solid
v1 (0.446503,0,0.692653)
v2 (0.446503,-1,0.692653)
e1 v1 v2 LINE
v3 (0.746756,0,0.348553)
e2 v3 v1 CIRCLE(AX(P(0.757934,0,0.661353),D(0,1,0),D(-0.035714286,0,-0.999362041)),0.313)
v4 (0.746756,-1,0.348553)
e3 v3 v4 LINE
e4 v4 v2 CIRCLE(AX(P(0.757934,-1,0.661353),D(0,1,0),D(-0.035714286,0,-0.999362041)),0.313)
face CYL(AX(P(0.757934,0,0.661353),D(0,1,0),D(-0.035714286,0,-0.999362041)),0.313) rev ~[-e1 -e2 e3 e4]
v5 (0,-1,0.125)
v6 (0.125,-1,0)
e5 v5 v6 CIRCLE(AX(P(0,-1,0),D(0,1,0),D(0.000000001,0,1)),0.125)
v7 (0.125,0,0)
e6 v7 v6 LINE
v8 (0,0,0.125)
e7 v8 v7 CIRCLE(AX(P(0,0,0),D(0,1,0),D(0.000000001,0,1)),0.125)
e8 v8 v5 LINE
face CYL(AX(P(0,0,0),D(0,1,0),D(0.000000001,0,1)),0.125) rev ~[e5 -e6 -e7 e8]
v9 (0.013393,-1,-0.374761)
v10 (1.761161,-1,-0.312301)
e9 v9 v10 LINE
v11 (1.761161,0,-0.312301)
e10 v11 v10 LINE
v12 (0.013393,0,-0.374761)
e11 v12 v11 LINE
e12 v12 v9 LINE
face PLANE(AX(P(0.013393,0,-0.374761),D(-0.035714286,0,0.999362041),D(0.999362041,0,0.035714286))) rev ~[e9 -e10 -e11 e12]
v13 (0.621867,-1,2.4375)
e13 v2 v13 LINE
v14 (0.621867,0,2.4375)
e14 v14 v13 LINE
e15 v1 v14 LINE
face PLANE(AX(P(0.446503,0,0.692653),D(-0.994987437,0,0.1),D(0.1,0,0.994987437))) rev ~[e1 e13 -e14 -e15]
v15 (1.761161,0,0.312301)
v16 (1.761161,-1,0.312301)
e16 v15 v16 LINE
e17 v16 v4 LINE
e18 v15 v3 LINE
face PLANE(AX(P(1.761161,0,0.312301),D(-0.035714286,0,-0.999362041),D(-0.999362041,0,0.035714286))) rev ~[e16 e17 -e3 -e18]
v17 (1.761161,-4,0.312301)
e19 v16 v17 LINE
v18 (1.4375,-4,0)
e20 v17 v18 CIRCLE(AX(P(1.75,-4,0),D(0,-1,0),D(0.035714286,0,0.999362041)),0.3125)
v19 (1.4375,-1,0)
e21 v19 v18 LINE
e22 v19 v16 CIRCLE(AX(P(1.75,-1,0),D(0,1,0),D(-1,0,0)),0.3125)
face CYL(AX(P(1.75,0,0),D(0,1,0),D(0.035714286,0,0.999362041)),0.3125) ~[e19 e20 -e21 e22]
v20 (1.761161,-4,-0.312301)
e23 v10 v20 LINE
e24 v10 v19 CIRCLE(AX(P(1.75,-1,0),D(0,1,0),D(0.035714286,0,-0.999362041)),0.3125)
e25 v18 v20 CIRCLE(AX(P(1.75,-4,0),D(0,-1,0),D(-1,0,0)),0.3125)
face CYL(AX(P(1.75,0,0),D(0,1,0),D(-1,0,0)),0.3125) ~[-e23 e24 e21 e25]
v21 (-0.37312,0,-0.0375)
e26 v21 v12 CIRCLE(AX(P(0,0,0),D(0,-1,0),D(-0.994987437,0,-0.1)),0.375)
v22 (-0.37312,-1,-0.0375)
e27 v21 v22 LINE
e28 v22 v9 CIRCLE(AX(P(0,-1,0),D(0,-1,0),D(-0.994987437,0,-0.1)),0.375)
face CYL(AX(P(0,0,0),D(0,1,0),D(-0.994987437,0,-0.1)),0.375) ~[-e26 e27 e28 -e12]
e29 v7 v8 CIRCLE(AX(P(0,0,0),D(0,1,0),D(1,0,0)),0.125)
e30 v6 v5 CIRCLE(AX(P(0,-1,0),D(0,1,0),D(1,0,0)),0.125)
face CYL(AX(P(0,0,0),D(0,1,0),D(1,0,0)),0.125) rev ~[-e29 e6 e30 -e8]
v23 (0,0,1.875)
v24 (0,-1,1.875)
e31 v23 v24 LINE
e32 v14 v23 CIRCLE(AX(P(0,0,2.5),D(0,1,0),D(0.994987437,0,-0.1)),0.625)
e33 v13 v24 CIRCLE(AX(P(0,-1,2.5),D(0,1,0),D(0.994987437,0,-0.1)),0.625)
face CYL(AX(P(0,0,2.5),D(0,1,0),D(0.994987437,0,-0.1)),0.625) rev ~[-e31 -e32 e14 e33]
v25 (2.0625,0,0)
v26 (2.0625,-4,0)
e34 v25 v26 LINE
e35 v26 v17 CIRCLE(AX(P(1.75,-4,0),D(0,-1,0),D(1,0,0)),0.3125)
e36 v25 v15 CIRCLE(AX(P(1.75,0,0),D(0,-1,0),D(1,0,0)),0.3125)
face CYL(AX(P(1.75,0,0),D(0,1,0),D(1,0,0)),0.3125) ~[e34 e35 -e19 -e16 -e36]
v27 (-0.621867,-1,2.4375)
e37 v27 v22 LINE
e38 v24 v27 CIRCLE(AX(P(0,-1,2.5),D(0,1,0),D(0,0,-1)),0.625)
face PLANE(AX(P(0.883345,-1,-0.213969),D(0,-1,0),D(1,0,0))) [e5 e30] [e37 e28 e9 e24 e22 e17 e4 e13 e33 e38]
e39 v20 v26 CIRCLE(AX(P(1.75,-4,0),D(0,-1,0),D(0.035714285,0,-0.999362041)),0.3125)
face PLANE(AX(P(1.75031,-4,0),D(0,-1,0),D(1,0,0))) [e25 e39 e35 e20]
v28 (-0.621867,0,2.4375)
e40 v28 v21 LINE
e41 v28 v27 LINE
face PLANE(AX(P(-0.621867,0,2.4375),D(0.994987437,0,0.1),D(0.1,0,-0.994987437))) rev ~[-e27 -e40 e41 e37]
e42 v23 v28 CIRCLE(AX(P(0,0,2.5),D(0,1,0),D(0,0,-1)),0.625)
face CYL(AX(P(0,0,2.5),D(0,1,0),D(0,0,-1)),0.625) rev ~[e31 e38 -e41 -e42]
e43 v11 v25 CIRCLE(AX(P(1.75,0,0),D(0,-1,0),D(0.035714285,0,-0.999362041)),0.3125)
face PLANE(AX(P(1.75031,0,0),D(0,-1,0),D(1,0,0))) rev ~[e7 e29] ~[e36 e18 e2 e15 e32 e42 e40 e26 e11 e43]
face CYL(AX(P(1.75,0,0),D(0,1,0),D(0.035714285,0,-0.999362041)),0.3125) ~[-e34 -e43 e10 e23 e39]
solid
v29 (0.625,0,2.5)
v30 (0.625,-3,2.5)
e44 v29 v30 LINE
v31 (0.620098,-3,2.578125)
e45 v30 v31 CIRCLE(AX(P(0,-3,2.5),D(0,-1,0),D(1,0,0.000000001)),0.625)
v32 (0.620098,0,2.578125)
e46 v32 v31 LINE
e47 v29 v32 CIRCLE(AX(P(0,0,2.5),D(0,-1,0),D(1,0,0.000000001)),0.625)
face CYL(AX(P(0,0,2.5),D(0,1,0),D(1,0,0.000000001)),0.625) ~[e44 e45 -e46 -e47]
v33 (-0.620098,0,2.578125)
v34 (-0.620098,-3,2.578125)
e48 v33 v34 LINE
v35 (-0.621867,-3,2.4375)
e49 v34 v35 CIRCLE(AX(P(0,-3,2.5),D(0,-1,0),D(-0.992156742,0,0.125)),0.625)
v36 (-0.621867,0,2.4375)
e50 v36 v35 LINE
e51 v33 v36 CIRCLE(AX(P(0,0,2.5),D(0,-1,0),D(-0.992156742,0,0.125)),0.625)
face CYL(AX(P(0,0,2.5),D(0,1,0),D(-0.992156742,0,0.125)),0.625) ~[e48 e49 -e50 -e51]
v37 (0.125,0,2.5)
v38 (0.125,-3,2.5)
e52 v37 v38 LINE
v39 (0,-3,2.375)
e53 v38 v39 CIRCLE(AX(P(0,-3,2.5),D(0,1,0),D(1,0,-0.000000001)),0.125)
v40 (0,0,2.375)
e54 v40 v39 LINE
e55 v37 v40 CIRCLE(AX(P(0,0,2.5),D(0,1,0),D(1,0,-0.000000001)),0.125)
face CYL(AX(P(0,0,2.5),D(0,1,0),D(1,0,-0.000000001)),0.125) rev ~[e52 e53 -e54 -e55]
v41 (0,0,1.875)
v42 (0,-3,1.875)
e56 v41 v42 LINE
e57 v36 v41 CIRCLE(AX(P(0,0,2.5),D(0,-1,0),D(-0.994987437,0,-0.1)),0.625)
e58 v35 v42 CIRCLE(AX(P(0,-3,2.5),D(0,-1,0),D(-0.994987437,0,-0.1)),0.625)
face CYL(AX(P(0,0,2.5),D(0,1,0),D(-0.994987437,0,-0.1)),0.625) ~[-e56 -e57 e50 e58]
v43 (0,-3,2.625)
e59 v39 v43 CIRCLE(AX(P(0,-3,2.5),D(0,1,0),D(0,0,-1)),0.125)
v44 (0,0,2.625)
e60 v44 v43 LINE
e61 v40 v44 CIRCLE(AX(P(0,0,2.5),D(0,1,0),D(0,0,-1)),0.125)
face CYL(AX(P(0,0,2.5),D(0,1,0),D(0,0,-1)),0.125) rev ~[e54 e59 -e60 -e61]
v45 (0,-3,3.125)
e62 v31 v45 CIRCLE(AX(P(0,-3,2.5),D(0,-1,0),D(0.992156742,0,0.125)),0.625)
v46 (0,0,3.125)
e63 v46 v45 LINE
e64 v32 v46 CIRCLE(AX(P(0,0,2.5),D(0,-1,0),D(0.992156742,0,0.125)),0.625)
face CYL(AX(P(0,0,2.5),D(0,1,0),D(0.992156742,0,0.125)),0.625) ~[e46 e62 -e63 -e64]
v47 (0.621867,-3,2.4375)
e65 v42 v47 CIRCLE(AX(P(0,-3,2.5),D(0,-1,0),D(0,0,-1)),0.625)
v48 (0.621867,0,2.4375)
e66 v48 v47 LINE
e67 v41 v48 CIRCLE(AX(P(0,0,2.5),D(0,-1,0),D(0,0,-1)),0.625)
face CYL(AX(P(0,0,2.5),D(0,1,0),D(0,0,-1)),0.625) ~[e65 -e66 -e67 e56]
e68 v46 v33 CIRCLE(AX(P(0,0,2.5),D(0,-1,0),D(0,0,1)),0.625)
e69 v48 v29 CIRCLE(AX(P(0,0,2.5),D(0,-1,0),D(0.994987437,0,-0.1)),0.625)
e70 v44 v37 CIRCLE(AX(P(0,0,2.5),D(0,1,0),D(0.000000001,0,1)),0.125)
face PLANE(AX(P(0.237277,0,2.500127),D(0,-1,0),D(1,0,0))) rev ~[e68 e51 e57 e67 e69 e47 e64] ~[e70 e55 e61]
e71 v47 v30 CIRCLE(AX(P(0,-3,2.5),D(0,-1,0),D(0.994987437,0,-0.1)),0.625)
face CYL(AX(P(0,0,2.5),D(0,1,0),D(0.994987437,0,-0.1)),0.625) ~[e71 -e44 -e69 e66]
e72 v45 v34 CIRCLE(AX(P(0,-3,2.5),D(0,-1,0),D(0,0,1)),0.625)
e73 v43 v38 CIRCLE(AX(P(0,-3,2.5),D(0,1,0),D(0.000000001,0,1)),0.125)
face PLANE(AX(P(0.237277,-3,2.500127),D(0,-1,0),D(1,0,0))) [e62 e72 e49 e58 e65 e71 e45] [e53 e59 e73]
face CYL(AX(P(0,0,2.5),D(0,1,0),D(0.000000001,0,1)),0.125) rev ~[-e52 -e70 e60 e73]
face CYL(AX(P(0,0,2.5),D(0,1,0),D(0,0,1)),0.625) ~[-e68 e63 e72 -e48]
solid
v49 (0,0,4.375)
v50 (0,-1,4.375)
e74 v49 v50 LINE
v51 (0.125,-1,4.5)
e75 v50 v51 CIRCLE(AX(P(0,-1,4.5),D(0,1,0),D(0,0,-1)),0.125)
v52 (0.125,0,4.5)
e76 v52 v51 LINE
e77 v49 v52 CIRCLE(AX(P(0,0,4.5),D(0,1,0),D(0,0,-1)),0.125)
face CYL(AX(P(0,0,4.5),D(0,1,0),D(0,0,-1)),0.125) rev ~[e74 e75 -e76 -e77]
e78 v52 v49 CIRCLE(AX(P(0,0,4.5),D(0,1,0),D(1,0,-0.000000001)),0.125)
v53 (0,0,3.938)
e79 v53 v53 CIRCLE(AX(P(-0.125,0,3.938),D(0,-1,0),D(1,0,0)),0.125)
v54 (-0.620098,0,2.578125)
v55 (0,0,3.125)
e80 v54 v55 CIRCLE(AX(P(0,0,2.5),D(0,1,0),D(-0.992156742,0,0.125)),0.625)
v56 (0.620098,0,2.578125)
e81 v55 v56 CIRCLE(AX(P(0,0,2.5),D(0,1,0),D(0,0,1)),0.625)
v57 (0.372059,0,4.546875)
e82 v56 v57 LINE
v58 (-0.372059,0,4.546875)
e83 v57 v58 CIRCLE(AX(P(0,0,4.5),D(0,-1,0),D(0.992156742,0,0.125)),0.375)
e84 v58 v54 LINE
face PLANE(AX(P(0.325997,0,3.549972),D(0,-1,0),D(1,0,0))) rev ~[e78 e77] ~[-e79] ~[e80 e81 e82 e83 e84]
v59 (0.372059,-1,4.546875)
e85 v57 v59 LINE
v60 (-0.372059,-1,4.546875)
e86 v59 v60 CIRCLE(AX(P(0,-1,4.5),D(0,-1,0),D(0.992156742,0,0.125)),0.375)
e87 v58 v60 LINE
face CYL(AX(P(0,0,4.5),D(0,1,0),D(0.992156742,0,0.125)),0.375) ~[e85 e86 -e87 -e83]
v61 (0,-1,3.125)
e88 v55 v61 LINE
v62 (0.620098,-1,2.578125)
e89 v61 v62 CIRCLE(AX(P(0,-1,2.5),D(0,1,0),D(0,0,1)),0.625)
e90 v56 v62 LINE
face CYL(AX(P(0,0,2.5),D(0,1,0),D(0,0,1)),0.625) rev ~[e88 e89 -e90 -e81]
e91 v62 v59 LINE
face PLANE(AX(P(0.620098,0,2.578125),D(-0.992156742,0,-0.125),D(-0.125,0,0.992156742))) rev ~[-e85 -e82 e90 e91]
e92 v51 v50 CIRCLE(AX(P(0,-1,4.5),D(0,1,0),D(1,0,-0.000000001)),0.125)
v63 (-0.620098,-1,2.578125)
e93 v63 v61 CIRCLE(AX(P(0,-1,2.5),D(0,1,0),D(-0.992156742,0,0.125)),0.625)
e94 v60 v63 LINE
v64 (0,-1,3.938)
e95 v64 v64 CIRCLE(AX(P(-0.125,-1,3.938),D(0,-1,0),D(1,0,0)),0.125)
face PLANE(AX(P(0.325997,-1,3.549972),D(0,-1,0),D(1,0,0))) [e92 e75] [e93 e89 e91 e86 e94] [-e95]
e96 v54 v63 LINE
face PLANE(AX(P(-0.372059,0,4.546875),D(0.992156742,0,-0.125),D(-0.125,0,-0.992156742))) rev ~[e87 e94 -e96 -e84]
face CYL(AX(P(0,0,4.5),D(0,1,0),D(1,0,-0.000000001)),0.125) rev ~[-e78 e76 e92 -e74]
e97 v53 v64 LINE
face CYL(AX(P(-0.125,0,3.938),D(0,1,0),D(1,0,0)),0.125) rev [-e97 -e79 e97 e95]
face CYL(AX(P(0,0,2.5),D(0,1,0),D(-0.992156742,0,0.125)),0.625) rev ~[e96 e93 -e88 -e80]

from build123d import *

# Parameters (mm, degrees)
F1_DEPTH = 1
F0_R     = 0.125
F2_DEPTH = 3
F3_DEPTH = 4


with BuildPart() as f1:
    # F0 (on Front) → F1 (new body)
    with BuildSketch(Plane.XZ):
        with BuildLine():
            Line((1.4375, 0), (0.375, 0))
            ThreePointArc((0.375, 0), (0.2698585939, -0.2603869031), (0.0133928571, -0.3747607655))
            Line((0.0133928571, -0.3747607655), (1.7611607143, -0.3123006379))
            ThreePointArc((1.7611607143, -0.3123006379), (1.5330109141, -0.2248821616), (1.4375, 0))
        make_face()
        with BuildLine():
            Line((0.375, 0), (0.125, 0))
            ThreePointArc((0.125, 0), (-0.0883883476, -0.0883883476), (0, 0.125))
            Line((0, 0.125), (0, 0.375))
            ThreePointArc((0, 0.375), (-0.2781074433, 0.2515576475), (-0.3731202889, -0.0375))
            ThreePointArc((-0.3731202889, -0.0375), (-0.2465505268, -0.2825559019), (0.0133928571, -0.3747607655))
            ThreePointArc((0.0133928571, -0.3747607655), (0.2698585939, -0.2603869031), (0.375, 0))
        make_face()
        with BuildLine():
            ThreePointArc((0, 0.375), (0.2651650429, 0.2651650429), (0.375, 0))
            Line((0.375, 0), (1.4375, 0))
            ThreePointArc((1.4375, 0), (1.5330109141, 0.2248821616), (1.7611607143, 0.3123006379))
            Line((1.7611607143, 0.3123006379), (0.7467559055, 0.3485525083))
            ThreePointArc((0.7467559055, 0.3485525083), (0.5220944841, 0.4555653209), (0.4465034091, 0.6926528273))
            Line((0.4465034091, 0.6926528273), (0.6218671482, 2.4375))
            ThreePointArc((0.6218671482, 2.4375), (0.4192627458, 2.0364875946), (0, 1.875))
            Line((0, 1.875), (0, 0.375))
        make_face()
        with BuildLine():
            ThreePointArc((-0.3731202889, -0.0375), (-0.2781074433, 0.2515576475), (0, 0.375))
            Line((0, 0.375), (0, 1.875))
            ThreePointArc((0, 1.875), (-0.4192627458, 2.0364875946), (-0.6218671482, 2.4375))
            Line((-0.6218671482, 2.4375), (-0.3731202889, -0.0375))
        make_face()
        with BuildLine():
            ThreePointArc((0, 0.125), (0.0883883476, 0.0883883476), (0.125, 0))
            Line((0.125, 0), (0.375, 0))
            ThreePointArc((0.375, 0), (0.2651650429, 0.2651650429), (0, 0.375))
            Line((0, 0.375), (0, 0.125))
        make_face()
    extrude(amount=F1_DEPTH)

    # F0 (on Front) → F3 (join)
    with BuildSketch(Plane.XZ):
        with BuildLine():
            ThreePointArc((1.7611607143, 0.3123006379), (1.5330109141, 0.2248821616), (1.4375, 0))
            ThreePointArc((1.4375, 0), (1.5330109141, -0.2248821616), (1.7611607143, -0.3123006379))
            ThreePointArc((1.7611607143, -0.3123006379), (1.9748821616, -0.2169890859), (2.0625, 0))
            ThreePointArc((2.0625, 0), (1.9748821616, 0.2169890859), (1.7611607143, 0.3123006379))
        make_face()
        with BuildLine():
            ThreePointArc((1.875, 0), (1.75, -0.125), (1.625, 0))
            ThreePointArc((1.625, 0), (1.75, 0.125), (1.875, 0))
        make_face(mode=Mode.SUBTRACT)
        with BuildLine():
            ThreePointArc((1.875, 0), (1.75, 0.125), (1.625, 0))
            ThreePointArc((1.625, 0), (1.75, -0.125), (1.875, 0))
        make_face()
    extrude(amount=F3_DEPTH)


with BuildPart() as f1b:
    # F0 (on Front) → F1, piece 2 (new body)
    with BuildSketch(Plane.XZ):
        with BuildLine():
            Line((0, 3.938), (0, 3.125))
            ThreePointArc((0, 3.125), (0.4133986424, 2.96875), (0.6200979635, 2.578125))
            Line((0.6200979635, 2.578125), (0.3720587781, 4.546875))
            ThreePointArc((0.3720587781, 4.546875), (0.3742639722, 4.5234835922), (0.375, 4.5))
            ThreePointArc((0.375, 4.5), (0.2651650429, 4.2348349571), (0, 4.125))
            Line((0, 4.125), (0, 3.938))
        make_face()
        with BuildLine():
            Line((-0.3720587781, 4.546875), (-0.6200979635, 2.578125))
            ThreePointArc((-0.6200979635, 2.578125), (-0.4133986424, 2.96875), (0, 3.125))
            Line((0, 3.125), (0, 3.938))
            Line((0, 3.938), (0, 4.125))
            ThreePointArc((0, 4.125), (-0.28125, 4.2519608146), (-0.3720587781, 4.546875))
        make_face()
        with Locations((-0.125, 3.938)):
            Circle(F0_R, mode=Mode.SUBTRACT)
        with BuildLine():
            ThreePointArc((0.3720587781, 4.546875), (0, 4.875), (-0.3720587781, 4.546875))
            ThreePointArc((-0.3720587781, 4.546875), (-0.28125, 4.2519608146), (0, 4.125))
            ThreePointArc((0, 4.125), (0.2651650429, 4.2348349571), (0.375, 4.5))
            ThreePointArc((0.375, 4.5), (0.3742639722, 4.5234835922), (0.3720587781, 4.546875))
        make_face()
        with BuildLine():
            ThreePointArc((0.125, 4.5), (0.0883883476, 4.4116116524), (0, 4.375))
            ThreePointArc((0, 4.375), (-0.0883883476, 4.5883883476), (0.125, 4.5))
        make_face(mode=Mode.SUBTRACT)
    extrude(amount=F1_DEPTH)


with BuildPart() as f2:
    # F0 (on Front) → F2 (new body)
    with BuildSketch(Plane.XZ):
        with BuildLine():
            Line((0, 2.375), (0, 1.875))
            ThreePointArc((0, 1.875), (0.4192627458, 2.0364875946), (0.6218671482, 2.4375))
            ThreePointArc((0.6218671482, 2.4375), (0.6242162957, 2.4687107656), (0.625, 2.5))
            ThreePointArc((0.625, 2.5), (0.623773287, 2.5391393203), (0.6200979635, 2.578125))
            ThreePointArc((0.6200979635, 2.578125), (0.4133986424, 2.96875), (0, 3.125))
            Line((0, 3.125), (0, 2.625))
            ThreePointArc((0, 2.625), (0.0883883476, 2.5883883476), (0.125, 2.5))
            ThreePointArc((0.125, 2.5), (0.0883883476, 2.4116116524), (0, 2.375))
        make_face()
        with BuildLine():
            ThreePointArc((-0.6218671482, 2.4375), (-0.4192627458, 2.0364875946), (0, 1.875))
            Line((0, 1.875), (0, 2.375))
            ThreePointArc((0, 2.375), (-0.125, 2.5), (0, 2.625))
            Line((0, 2.625), (0, 3.125))
            ThreePointArc((0, 3.125), (-0.4133986424, 2.96875), (-0.6200979635, 2.578125))
            ThreePointArc((-0.6200979635, 2.578125), (-0.6249505439, 2.5078624207), (-0.6218671482, 2.4375))
        make_face()
    extrude(amount=F2_DEPTH)


solid = Compound([f1.part, f1b.part, f2.part])
